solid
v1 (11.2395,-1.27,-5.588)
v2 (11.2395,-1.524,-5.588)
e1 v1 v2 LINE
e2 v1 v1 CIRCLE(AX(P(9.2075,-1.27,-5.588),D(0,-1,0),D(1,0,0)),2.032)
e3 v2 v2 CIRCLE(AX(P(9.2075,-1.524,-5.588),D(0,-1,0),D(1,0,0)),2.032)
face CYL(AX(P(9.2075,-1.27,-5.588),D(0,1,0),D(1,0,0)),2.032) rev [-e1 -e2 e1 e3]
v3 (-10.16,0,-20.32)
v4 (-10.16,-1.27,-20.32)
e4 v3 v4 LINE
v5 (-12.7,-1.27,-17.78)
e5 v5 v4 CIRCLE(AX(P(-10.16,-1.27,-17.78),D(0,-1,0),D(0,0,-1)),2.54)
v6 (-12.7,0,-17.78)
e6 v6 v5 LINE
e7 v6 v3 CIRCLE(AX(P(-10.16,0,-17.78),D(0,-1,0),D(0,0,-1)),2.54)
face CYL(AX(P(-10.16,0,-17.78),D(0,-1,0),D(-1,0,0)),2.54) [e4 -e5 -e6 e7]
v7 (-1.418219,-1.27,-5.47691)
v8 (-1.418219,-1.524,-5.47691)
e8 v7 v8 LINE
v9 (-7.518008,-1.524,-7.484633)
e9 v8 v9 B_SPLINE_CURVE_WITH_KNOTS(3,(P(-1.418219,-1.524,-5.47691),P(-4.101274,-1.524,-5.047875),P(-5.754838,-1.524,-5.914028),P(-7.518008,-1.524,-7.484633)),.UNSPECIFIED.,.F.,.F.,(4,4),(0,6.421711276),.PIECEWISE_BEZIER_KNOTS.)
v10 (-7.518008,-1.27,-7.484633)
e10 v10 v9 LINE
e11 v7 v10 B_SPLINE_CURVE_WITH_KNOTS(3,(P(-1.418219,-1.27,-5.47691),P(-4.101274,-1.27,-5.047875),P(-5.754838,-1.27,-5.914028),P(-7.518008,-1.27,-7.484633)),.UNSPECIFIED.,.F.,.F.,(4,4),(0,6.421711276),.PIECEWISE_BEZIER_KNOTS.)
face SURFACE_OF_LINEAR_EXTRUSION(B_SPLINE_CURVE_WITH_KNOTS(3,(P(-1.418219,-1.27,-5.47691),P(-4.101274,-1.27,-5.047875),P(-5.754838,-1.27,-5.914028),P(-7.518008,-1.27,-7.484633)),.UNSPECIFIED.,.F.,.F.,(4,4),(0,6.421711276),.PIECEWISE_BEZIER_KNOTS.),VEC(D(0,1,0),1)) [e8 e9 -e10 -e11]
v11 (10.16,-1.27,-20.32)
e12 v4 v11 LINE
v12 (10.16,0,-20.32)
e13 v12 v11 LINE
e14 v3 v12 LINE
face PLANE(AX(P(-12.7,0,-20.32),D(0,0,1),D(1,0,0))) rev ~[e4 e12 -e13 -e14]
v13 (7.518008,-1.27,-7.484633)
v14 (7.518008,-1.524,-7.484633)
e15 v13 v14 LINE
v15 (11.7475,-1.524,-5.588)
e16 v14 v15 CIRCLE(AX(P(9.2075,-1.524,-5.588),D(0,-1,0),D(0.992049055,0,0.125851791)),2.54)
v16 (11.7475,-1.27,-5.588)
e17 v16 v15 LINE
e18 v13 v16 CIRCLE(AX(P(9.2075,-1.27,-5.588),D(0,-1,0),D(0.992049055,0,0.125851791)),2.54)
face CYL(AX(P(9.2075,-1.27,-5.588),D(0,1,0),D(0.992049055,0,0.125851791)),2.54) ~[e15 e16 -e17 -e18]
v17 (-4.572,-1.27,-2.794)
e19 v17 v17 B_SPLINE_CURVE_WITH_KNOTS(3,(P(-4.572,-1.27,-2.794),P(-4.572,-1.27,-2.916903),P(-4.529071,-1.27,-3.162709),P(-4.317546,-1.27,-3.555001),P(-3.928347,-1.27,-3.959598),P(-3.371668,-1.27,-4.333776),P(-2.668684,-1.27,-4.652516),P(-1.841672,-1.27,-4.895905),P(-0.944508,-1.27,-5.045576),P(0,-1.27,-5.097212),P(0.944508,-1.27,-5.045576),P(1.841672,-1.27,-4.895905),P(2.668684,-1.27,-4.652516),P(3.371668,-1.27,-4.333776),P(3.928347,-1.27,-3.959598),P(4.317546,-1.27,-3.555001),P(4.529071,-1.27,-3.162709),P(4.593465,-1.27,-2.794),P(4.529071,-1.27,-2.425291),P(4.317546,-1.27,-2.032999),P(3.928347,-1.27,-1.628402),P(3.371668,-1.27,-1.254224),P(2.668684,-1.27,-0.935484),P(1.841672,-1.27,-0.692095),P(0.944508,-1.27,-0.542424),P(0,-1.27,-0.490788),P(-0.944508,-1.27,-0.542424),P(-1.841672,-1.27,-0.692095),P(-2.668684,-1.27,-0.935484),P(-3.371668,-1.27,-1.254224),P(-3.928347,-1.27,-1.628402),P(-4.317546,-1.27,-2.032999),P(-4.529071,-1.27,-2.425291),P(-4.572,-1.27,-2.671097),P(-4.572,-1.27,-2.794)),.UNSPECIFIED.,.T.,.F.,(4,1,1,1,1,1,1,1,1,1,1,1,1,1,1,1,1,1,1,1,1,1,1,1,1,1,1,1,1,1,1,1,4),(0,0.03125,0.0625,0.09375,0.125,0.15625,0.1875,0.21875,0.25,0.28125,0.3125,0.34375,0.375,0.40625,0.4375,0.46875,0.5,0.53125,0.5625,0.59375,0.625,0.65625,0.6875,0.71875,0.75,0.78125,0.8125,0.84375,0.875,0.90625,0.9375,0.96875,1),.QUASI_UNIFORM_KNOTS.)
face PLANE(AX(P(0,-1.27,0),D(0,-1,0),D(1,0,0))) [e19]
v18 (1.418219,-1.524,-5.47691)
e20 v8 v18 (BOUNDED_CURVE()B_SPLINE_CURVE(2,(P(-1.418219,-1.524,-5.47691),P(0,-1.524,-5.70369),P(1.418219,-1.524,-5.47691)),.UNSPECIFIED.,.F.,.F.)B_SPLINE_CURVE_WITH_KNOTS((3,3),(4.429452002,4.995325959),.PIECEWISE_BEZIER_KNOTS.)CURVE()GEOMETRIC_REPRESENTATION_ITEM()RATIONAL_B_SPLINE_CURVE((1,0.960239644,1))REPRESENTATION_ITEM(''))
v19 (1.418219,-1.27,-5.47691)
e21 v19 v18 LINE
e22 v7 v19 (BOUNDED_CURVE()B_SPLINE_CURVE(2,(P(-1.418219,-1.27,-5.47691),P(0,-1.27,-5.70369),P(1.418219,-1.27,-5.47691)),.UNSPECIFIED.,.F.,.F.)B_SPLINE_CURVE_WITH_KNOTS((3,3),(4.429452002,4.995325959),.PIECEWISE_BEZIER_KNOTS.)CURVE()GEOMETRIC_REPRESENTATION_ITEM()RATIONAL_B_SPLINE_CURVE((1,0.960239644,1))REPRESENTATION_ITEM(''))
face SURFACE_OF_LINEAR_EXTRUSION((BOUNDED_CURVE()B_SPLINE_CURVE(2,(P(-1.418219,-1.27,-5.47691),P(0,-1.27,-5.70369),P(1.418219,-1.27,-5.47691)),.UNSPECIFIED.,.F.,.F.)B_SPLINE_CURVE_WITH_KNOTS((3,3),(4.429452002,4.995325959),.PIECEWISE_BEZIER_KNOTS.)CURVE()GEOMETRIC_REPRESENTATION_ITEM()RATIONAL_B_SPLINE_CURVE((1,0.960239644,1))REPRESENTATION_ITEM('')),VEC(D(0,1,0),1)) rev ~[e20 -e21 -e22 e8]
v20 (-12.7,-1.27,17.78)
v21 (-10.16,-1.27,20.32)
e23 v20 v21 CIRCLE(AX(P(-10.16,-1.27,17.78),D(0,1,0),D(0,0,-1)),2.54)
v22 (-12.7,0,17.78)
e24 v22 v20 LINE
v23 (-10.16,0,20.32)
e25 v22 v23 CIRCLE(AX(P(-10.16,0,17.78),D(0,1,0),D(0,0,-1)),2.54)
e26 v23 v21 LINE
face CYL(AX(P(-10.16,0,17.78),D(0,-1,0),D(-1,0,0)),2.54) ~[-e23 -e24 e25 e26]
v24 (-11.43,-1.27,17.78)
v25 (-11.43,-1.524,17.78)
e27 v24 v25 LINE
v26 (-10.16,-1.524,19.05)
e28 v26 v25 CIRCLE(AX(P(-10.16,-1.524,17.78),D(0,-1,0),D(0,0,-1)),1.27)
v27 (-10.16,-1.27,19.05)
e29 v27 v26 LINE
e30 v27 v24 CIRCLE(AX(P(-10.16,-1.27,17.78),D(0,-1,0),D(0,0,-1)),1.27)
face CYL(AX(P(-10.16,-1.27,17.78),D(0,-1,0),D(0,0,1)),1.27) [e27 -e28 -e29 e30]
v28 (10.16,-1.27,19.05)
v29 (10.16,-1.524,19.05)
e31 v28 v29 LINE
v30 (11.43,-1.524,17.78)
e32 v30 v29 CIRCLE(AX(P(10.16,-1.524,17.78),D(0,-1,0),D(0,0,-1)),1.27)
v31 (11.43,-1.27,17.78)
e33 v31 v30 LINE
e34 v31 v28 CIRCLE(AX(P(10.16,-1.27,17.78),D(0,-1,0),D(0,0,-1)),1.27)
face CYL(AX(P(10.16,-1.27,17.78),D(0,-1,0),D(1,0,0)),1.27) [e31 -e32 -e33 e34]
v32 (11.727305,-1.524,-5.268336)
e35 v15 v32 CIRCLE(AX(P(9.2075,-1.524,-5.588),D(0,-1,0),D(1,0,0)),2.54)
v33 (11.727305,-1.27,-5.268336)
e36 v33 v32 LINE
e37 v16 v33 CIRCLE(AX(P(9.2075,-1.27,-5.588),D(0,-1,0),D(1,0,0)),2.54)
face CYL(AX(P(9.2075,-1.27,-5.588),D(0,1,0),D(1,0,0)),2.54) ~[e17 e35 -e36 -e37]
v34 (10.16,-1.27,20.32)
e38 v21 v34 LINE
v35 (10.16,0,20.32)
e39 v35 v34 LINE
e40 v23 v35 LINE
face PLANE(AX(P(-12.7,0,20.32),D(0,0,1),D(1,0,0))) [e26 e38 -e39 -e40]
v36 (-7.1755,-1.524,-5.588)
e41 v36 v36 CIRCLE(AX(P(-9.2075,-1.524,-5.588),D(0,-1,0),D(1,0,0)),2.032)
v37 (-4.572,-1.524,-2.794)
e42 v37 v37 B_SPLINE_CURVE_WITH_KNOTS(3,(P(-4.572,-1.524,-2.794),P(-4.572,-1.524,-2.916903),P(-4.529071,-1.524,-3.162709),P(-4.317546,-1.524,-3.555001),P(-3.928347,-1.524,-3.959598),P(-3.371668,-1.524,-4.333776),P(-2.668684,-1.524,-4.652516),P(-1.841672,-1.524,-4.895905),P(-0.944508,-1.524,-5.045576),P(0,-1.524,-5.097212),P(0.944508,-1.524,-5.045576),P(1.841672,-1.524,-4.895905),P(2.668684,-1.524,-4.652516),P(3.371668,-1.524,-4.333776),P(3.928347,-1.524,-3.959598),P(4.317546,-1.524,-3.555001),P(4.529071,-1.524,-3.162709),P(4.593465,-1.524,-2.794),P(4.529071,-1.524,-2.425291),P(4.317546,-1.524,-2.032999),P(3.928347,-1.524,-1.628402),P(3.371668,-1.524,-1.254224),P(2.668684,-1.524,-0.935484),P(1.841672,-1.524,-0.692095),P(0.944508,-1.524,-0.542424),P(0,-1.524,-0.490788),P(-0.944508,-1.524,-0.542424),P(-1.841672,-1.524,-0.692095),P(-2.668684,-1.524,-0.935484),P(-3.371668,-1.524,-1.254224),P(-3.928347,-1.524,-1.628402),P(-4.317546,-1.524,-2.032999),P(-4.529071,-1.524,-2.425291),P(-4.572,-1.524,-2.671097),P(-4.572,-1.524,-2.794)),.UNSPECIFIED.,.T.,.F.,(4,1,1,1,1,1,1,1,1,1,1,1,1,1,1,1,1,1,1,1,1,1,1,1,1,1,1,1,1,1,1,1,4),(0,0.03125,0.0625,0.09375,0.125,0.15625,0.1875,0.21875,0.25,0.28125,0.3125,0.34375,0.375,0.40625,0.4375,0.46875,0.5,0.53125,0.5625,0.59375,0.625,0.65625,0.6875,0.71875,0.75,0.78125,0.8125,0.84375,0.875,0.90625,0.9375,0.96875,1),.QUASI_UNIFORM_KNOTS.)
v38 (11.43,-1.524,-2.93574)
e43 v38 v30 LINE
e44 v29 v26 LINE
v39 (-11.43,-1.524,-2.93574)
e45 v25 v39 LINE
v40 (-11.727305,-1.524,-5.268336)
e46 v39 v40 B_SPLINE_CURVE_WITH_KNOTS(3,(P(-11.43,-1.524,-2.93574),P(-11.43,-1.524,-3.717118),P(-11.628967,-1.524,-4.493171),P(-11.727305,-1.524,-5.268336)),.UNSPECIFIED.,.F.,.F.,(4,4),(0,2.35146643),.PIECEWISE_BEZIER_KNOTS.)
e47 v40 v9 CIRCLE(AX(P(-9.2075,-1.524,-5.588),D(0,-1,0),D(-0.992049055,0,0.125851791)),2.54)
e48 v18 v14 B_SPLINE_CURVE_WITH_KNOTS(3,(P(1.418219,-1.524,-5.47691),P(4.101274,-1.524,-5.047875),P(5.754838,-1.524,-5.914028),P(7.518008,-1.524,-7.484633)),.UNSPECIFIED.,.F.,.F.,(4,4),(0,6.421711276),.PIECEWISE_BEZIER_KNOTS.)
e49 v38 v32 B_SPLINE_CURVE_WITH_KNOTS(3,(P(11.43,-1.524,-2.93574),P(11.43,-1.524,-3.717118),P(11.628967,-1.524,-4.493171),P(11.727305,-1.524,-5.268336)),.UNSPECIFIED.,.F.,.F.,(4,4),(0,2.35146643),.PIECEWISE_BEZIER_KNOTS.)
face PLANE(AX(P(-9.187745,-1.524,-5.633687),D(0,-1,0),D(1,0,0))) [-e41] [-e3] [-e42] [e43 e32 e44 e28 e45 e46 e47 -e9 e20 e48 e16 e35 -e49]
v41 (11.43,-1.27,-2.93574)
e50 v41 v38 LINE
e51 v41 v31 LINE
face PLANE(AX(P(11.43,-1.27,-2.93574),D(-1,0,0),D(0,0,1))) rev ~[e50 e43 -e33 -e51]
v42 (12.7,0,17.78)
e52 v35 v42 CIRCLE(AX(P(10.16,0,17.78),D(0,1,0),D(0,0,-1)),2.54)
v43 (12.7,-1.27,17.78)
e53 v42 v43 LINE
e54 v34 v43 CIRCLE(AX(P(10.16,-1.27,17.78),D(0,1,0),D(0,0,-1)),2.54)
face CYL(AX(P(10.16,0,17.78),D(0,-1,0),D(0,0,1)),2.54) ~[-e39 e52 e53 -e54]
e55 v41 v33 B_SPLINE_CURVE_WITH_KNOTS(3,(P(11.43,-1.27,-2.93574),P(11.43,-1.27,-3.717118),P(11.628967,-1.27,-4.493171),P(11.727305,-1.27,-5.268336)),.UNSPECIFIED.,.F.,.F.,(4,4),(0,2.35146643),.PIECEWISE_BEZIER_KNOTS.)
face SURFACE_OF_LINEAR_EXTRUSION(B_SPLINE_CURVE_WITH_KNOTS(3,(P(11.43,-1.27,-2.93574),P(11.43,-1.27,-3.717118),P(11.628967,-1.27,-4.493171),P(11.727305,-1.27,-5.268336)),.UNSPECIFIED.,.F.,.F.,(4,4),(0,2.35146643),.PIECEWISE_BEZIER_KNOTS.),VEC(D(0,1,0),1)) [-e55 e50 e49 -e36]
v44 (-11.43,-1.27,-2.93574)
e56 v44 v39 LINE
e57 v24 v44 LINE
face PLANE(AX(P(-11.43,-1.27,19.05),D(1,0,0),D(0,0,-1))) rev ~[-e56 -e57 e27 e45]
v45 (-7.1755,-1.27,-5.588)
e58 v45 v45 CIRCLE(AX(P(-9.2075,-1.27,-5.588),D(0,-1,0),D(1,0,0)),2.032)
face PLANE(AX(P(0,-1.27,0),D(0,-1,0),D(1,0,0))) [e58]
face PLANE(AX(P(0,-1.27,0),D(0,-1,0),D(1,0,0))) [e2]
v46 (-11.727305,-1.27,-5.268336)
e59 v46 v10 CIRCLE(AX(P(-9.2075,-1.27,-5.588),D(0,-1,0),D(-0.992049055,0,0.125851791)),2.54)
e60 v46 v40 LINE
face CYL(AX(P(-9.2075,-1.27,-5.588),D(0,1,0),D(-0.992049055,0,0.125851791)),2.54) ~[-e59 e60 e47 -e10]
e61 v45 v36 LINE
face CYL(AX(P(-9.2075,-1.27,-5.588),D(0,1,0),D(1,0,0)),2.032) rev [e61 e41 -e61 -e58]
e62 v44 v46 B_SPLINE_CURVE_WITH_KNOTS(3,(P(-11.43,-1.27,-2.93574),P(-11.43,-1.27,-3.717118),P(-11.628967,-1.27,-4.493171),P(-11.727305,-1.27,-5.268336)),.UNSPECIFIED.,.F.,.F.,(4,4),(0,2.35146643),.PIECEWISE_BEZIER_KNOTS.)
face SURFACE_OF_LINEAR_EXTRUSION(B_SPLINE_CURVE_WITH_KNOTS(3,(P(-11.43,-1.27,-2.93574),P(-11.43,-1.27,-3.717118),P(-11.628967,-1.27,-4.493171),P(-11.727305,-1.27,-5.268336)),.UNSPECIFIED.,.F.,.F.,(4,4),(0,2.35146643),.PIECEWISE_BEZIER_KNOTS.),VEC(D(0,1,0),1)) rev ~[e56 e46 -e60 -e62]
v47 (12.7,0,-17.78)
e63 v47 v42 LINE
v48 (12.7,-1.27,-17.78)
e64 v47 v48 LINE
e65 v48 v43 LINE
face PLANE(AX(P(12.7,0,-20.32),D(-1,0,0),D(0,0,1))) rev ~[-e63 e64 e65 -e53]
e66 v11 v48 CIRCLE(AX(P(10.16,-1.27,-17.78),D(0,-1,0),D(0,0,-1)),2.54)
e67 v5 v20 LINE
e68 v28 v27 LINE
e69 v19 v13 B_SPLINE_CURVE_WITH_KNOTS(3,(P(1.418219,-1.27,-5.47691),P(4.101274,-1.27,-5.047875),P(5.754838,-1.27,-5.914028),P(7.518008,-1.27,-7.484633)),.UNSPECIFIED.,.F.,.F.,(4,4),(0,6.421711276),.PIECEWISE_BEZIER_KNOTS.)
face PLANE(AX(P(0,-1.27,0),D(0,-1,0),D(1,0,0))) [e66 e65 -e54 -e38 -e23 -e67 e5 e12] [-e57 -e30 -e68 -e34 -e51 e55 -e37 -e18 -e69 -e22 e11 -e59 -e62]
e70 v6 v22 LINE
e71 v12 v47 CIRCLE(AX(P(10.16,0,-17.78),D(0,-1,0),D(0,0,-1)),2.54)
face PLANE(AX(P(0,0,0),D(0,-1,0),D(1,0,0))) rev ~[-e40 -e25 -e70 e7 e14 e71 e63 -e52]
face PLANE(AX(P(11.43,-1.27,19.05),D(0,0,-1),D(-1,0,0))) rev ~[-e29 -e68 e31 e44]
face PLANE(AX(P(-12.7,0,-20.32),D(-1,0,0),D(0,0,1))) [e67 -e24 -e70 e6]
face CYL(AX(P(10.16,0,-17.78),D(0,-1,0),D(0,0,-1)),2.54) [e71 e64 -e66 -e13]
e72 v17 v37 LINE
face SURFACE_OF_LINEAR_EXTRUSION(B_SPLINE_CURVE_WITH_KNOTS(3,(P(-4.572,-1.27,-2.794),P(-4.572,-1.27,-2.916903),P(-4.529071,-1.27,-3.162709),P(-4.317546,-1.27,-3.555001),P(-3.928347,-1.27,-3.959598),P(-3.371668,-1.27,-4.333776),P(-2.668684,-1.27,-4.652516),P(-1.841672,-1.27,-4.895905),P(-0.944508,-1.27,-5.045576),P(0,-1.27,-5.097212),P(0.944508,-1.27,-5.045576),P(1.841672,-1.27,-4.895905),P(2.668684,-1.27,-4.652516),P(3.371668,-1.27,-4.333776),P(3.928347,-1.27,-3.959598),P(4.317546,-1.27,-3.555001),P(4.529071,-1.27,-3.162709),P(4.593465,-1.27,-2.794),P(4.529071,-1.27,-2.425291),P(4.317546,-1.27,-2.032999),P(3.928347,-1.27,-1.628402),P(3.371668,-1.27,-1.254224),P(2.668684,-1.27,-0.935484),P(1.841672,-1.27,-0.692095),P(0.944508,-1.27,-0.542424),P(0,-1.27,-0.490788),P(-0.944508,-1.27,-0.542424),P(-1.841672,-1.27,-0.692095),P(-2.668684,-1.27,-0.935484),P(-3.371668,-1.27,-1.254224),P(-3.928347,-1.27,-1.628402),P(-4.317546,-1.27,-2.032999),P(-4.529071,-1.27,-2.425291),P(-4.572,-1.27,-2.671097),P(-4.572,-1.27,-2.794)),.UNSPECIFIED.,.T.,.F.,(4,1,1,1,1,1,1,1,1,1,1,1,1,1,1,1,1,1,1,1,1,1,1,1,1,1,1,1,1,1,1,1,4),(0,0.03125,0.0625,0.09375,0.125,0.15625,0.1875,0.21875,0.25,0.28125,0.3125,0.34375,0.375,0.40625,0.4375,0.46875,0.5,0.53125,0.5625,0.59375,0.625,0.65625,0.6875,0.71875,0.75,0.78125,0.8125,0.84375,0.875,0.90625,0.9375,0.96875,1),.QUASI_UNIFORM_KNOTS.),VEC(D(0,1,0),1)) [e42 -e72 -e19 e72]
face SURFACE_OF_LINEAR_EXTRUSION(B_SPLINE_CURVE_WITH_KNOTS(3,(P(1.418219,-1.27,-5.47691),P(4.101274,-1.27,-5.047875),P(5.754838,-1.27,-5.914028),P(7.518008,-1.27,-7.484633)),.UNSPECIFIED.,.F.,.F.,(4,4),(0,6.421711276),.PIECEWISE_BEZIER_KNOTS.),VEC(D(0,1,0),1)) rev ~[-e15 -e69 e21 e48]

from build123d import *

# Parameters (mm, degrees)
F0_W     = 25.4
F0_H     = 40.64
F1_DEPTH = 1.27
F2_R     = 2.032
F3_DEPTH = 0.254
F4_R     = 2.54
F5_R     = 1.27


# Not quite as in the source:
# - the dataset's text gives a spline's control points without its knots; the knots are read off the source's solid


with BuildPart() as f1:
    # F0 (on Front) → F1 (new body)
    with BuildSketch(Plane.XZ):
        Rectangle(F0_W, F0_H)
    extrude(amount=F1_DEPTH)

    # F2 (on face) → F3 (join)
    with BuildSketch(Plane.XZ.offset(1.27)):
        with BuildLine():
            ThreePointArc((-7.5180080999, -7.4846331009), (-6.8898600985, -6.6273003834), (-6.6675, -5.588))
            ThreePointArc((-6.6675, -5.588), (-9.0473495717, -3.0530538782), (-11.7273045987, -5.268336451))
            ThreePointArc((-11.7273045987, -5.268336451), (-10.3908627949, -7.8354991648), (-7.5180080999, -7.4846331009))
        make_face()
        with Locations((-9.2075, -5.588)):
            Circle(F2_R, mode=Mode.SUBTRACT)
        with BuildLine():
            ThreePointArc((-11.7273045987, -5.268336451), (-9.0473495717, -3.0530538782), (-6.6675, -5.588))
            ThreePointArc((-6.6675, -5.588), (-6.8898600985, -6.6273003834), (-7.5180080999, -7.4846331009))
            add(Edge.make_bspline(
                [(-1.4182194217, -5.4769095653), (-4.1012740694, -5.0478749908), (-5.7548377663, -5.9140278026), (-7.5180080999, -7.4846331009)],
                knots=[0, 0, 0, 0, 6.4217112762, 6.4217112762, 6.4217112762, 6.4217112762], degree=3))
            add(Edge.make_bspline(
                [(-5.08, -2.794), (-5.08, -4.8913715579), (-1.4182194217, -5.4769095653)],
                knots=[3.1415926536, 3.1415926536, 3.1415926536, 4.4294520022, 4.4294520022, 4.4294520022], degree=2, weights=[1, 0.7997427872, 1]))
            add(Edge.make_bspline(
                [(5.08, -2.794), (5.08, 0), (0, 0), (-5.08, 0), (-5.08, -2.794)],
                knots=[0, 0, 0, 1.5707963268, 1.5707963268, 3.1415926536, 3.1415926536, 3.1415926536], degree=2, weights=[1, 0.7071067812, 1, 0.7071067812, 1]))
            add(Edge.make_bspline(
                [(1.4182194217, -5.4769095653), (5.08, -4.8913715579), (5.08, -2.794)],
                knots=[4.9953259586, 4.9953259586, 4.9953259586, 6.2831853072, 6.2831853072, 6.2831853072], degree=2, weights=[1, 0.7997427872, 1]))
            add(Edge.make_bspline(
                [(1.4182194217, -5.4769095653), (4.1012740694, -5.0478749908), (5.7548377663, -5.9140278026), (7.5180080999, -7.4846331009)],
                knots=[0, 0, 0, 0, 6.4217112762, 6.4217112762, 6.4217112762, 6.4217112762], degree=3))
            ThreePointArc((7.5180080999, -7.4846331009), (8.0241372051, -3.3405008352), (11.7273045987, -5.268336451))
            add(Edge.make_bspline(
                [(11.43, -2.9357403982), (11.43, -3.7171181073), (11.6289668146, -4.4931714335), (11.7273045987, -5.268336451)],
                knots=[0, 0, 0, 0, 2.3514664297, 2.3514664297, 2.3514664297, 2.3514664297], degree=3))
            Line((11.43, -2.9357403982), (11.43, 19.05))
            Line((11.43, 19.05), (-11.43, 19.05))
            Line((-11.43, 19.05), (-11.43, -2.9357403982))
            add(Edge.make_bspline(
                [(-11.43, -2.9357403982), (-11.43, -3.7171181073), (-11.6289668146, -4.4931714335), (-11.7273045987, -5.268336451)],
                knots=[0, 0, 0, 0, 2.3514664297, 2.3514664297, 2.3514664297, 2.3514664297], degree=3))
        make_face()
        with BuildLine():
            add(Edge.make_bspline(
                [(-5.08, -2.794), (-5.08, -4.8913715579), (-1.4182194217, -5.4769095653)],
                knots=[3.1415926536, 3.1415926536, 3.1415926536, 4.4294520022, 4.4294520022, 4.4294520022], degree=2, weights=[1, 0.7997427872, 1]))
            add(Edge.make_bspline(
                [(-1.4182194217, -5.4769095653), (0, -5.7036903231), (1.4182194217, -5.4769095653)],
                knots=[4.4294520022, 4.4294520022, 4.4294520022, 4.9953259586, 4.9953259586, 4.9953259586], degree=2, weights=[1, 0.960239644, 1]))
            add(Edge.make_bspline(
                [(1.4182194217, -5.4769095653), (5.08, -4.8913715579), (5.08, -2.794)],
                knots=[4.9953259586, 4.9953259586, 4.9953259586, 6.2831853072, 6.2831853072, 6.2831853072], degree=2, weights=[1, 0.7997427872, 1]))
            add(Edge.make_bspline(
                [(5.08, -2.794), (5.08, 0), (0, 0), (-5.08, 0), (-5.08, -2.794)],
                knots=[0, 0, 0, 1.5707963268, 1.5707963268, 3.1415926536, 3.1415926536, 3.1415926536], degree=2, weights=[1, 0.7071067812, 1, 0.7071067812, 1]))
        make_face()
        with BuildLine():
            add(Edge.make_bspline(
                [(-4.572, -2.794), (-4.572, -2.9169028513), (-4.5290705478, -3.1627085538), (-4.3175460933, -3.5550013791), (-3.9283471819, -3.9595979757), (-3.3716681218, -4.3337764728), (-2.6686840163, -4.6525156626), (-1.8416721788, -4.8959053951), (-0.9445084224, -5.0455757275), (0, -5.0972121363), (0.9445084224, -5.0455757275), (1.8416721788, -4.8959053951), (2.6686840163, -4.6525156626), (3.3716681218, -4.3337764728), (3.9283471819, -3.9595979757), (4.3175460933, -3.5550013791), (4.5290705478, -3.1627085538), (4.5934647261, -2.794), (4.5290705478, -2.4252914462), (4.3175460933, -2.0329986209), (3.9283471819, -1.6284020243), (3.3716681218, -1.2542235272), (2.6686840163, -0.9354843374), (1.8416721788, -0.6920946049), (0.9445084224, -0.5424242725), (0, -0.4907878637), (-0.9445084224, -0.5424242725), (-1.8416721788, -0.6920946049), (-2.6686840163, -0.9354843374), (-3.3716681218, -1.2542235272), (-3.9283471819, -1.6284020243), (-4.3175460933, -2.0329986209), (-4.5290705478, -2.4252914462), (-4.572, -2.6710971487), (-4.572, -2.794)],
                knots=[0, 0, 0, 0, 0.03125, 0.0625, 0.09375, 0.125, 0.15625, 0.1875, 0.21875, 0.25, 0.28125, 0.3125, 0.34375, 0.375, 0.40625, 0.4375, 0.46875, 0.5, 0.53125, 0.5625, 0.59375, 0.625, 0.65625, 0.6875, 0.71875, 0.75, 0.78125, 0.8125, 0.84375, 0.875, 0.90625, 0.9375, 0.96875, 1, 1, 1, 1], degree=3))
        make_face(mode=Mode.SUBTRACT)
        with BuildLine():
            ThreePointArc((11.7273045987, -5.268336451), (8.0241372051, -3.3405008352), (7.5180080999, -7.4846331009))
            ThreePointArc((7.5180080999, -7.4846331009), (10.2468003834, -7.9056399015), (11.7475, -5.588))
            ThreePointArc((11.7475, -5.588), (11.7424461218, -5.4278495717), (11.7273045987, -5.268336451))
        make_face()
        with Locations((9.2075, -5.588)):
            Circle(F2_R, mode=Mode.SUBTRACT)
    extrude(amount=F3_DEPTH)

    # F4
    f4_edges = [f1.edges().sort_by_distance(p)[0] for p in [
        (12.7, -0.635, -20.32),
        (-12.7, -0.635, -20.32),
        (-12.7, -0.635, 20.32),
        (12.7, -0.635, 20.32),
    ]]
    fillet(f4_edges, radius=F4_R)

    # F5
    f5_edges = [f1.edges().sort_by_distance(p)[0] for p in [
        (-11.43, -1.397, 19.05),
        (11.43, -1.397, 19.05),
    ]]
    fillet(f5_edges, radius=F5_R)


solid = f1.part
